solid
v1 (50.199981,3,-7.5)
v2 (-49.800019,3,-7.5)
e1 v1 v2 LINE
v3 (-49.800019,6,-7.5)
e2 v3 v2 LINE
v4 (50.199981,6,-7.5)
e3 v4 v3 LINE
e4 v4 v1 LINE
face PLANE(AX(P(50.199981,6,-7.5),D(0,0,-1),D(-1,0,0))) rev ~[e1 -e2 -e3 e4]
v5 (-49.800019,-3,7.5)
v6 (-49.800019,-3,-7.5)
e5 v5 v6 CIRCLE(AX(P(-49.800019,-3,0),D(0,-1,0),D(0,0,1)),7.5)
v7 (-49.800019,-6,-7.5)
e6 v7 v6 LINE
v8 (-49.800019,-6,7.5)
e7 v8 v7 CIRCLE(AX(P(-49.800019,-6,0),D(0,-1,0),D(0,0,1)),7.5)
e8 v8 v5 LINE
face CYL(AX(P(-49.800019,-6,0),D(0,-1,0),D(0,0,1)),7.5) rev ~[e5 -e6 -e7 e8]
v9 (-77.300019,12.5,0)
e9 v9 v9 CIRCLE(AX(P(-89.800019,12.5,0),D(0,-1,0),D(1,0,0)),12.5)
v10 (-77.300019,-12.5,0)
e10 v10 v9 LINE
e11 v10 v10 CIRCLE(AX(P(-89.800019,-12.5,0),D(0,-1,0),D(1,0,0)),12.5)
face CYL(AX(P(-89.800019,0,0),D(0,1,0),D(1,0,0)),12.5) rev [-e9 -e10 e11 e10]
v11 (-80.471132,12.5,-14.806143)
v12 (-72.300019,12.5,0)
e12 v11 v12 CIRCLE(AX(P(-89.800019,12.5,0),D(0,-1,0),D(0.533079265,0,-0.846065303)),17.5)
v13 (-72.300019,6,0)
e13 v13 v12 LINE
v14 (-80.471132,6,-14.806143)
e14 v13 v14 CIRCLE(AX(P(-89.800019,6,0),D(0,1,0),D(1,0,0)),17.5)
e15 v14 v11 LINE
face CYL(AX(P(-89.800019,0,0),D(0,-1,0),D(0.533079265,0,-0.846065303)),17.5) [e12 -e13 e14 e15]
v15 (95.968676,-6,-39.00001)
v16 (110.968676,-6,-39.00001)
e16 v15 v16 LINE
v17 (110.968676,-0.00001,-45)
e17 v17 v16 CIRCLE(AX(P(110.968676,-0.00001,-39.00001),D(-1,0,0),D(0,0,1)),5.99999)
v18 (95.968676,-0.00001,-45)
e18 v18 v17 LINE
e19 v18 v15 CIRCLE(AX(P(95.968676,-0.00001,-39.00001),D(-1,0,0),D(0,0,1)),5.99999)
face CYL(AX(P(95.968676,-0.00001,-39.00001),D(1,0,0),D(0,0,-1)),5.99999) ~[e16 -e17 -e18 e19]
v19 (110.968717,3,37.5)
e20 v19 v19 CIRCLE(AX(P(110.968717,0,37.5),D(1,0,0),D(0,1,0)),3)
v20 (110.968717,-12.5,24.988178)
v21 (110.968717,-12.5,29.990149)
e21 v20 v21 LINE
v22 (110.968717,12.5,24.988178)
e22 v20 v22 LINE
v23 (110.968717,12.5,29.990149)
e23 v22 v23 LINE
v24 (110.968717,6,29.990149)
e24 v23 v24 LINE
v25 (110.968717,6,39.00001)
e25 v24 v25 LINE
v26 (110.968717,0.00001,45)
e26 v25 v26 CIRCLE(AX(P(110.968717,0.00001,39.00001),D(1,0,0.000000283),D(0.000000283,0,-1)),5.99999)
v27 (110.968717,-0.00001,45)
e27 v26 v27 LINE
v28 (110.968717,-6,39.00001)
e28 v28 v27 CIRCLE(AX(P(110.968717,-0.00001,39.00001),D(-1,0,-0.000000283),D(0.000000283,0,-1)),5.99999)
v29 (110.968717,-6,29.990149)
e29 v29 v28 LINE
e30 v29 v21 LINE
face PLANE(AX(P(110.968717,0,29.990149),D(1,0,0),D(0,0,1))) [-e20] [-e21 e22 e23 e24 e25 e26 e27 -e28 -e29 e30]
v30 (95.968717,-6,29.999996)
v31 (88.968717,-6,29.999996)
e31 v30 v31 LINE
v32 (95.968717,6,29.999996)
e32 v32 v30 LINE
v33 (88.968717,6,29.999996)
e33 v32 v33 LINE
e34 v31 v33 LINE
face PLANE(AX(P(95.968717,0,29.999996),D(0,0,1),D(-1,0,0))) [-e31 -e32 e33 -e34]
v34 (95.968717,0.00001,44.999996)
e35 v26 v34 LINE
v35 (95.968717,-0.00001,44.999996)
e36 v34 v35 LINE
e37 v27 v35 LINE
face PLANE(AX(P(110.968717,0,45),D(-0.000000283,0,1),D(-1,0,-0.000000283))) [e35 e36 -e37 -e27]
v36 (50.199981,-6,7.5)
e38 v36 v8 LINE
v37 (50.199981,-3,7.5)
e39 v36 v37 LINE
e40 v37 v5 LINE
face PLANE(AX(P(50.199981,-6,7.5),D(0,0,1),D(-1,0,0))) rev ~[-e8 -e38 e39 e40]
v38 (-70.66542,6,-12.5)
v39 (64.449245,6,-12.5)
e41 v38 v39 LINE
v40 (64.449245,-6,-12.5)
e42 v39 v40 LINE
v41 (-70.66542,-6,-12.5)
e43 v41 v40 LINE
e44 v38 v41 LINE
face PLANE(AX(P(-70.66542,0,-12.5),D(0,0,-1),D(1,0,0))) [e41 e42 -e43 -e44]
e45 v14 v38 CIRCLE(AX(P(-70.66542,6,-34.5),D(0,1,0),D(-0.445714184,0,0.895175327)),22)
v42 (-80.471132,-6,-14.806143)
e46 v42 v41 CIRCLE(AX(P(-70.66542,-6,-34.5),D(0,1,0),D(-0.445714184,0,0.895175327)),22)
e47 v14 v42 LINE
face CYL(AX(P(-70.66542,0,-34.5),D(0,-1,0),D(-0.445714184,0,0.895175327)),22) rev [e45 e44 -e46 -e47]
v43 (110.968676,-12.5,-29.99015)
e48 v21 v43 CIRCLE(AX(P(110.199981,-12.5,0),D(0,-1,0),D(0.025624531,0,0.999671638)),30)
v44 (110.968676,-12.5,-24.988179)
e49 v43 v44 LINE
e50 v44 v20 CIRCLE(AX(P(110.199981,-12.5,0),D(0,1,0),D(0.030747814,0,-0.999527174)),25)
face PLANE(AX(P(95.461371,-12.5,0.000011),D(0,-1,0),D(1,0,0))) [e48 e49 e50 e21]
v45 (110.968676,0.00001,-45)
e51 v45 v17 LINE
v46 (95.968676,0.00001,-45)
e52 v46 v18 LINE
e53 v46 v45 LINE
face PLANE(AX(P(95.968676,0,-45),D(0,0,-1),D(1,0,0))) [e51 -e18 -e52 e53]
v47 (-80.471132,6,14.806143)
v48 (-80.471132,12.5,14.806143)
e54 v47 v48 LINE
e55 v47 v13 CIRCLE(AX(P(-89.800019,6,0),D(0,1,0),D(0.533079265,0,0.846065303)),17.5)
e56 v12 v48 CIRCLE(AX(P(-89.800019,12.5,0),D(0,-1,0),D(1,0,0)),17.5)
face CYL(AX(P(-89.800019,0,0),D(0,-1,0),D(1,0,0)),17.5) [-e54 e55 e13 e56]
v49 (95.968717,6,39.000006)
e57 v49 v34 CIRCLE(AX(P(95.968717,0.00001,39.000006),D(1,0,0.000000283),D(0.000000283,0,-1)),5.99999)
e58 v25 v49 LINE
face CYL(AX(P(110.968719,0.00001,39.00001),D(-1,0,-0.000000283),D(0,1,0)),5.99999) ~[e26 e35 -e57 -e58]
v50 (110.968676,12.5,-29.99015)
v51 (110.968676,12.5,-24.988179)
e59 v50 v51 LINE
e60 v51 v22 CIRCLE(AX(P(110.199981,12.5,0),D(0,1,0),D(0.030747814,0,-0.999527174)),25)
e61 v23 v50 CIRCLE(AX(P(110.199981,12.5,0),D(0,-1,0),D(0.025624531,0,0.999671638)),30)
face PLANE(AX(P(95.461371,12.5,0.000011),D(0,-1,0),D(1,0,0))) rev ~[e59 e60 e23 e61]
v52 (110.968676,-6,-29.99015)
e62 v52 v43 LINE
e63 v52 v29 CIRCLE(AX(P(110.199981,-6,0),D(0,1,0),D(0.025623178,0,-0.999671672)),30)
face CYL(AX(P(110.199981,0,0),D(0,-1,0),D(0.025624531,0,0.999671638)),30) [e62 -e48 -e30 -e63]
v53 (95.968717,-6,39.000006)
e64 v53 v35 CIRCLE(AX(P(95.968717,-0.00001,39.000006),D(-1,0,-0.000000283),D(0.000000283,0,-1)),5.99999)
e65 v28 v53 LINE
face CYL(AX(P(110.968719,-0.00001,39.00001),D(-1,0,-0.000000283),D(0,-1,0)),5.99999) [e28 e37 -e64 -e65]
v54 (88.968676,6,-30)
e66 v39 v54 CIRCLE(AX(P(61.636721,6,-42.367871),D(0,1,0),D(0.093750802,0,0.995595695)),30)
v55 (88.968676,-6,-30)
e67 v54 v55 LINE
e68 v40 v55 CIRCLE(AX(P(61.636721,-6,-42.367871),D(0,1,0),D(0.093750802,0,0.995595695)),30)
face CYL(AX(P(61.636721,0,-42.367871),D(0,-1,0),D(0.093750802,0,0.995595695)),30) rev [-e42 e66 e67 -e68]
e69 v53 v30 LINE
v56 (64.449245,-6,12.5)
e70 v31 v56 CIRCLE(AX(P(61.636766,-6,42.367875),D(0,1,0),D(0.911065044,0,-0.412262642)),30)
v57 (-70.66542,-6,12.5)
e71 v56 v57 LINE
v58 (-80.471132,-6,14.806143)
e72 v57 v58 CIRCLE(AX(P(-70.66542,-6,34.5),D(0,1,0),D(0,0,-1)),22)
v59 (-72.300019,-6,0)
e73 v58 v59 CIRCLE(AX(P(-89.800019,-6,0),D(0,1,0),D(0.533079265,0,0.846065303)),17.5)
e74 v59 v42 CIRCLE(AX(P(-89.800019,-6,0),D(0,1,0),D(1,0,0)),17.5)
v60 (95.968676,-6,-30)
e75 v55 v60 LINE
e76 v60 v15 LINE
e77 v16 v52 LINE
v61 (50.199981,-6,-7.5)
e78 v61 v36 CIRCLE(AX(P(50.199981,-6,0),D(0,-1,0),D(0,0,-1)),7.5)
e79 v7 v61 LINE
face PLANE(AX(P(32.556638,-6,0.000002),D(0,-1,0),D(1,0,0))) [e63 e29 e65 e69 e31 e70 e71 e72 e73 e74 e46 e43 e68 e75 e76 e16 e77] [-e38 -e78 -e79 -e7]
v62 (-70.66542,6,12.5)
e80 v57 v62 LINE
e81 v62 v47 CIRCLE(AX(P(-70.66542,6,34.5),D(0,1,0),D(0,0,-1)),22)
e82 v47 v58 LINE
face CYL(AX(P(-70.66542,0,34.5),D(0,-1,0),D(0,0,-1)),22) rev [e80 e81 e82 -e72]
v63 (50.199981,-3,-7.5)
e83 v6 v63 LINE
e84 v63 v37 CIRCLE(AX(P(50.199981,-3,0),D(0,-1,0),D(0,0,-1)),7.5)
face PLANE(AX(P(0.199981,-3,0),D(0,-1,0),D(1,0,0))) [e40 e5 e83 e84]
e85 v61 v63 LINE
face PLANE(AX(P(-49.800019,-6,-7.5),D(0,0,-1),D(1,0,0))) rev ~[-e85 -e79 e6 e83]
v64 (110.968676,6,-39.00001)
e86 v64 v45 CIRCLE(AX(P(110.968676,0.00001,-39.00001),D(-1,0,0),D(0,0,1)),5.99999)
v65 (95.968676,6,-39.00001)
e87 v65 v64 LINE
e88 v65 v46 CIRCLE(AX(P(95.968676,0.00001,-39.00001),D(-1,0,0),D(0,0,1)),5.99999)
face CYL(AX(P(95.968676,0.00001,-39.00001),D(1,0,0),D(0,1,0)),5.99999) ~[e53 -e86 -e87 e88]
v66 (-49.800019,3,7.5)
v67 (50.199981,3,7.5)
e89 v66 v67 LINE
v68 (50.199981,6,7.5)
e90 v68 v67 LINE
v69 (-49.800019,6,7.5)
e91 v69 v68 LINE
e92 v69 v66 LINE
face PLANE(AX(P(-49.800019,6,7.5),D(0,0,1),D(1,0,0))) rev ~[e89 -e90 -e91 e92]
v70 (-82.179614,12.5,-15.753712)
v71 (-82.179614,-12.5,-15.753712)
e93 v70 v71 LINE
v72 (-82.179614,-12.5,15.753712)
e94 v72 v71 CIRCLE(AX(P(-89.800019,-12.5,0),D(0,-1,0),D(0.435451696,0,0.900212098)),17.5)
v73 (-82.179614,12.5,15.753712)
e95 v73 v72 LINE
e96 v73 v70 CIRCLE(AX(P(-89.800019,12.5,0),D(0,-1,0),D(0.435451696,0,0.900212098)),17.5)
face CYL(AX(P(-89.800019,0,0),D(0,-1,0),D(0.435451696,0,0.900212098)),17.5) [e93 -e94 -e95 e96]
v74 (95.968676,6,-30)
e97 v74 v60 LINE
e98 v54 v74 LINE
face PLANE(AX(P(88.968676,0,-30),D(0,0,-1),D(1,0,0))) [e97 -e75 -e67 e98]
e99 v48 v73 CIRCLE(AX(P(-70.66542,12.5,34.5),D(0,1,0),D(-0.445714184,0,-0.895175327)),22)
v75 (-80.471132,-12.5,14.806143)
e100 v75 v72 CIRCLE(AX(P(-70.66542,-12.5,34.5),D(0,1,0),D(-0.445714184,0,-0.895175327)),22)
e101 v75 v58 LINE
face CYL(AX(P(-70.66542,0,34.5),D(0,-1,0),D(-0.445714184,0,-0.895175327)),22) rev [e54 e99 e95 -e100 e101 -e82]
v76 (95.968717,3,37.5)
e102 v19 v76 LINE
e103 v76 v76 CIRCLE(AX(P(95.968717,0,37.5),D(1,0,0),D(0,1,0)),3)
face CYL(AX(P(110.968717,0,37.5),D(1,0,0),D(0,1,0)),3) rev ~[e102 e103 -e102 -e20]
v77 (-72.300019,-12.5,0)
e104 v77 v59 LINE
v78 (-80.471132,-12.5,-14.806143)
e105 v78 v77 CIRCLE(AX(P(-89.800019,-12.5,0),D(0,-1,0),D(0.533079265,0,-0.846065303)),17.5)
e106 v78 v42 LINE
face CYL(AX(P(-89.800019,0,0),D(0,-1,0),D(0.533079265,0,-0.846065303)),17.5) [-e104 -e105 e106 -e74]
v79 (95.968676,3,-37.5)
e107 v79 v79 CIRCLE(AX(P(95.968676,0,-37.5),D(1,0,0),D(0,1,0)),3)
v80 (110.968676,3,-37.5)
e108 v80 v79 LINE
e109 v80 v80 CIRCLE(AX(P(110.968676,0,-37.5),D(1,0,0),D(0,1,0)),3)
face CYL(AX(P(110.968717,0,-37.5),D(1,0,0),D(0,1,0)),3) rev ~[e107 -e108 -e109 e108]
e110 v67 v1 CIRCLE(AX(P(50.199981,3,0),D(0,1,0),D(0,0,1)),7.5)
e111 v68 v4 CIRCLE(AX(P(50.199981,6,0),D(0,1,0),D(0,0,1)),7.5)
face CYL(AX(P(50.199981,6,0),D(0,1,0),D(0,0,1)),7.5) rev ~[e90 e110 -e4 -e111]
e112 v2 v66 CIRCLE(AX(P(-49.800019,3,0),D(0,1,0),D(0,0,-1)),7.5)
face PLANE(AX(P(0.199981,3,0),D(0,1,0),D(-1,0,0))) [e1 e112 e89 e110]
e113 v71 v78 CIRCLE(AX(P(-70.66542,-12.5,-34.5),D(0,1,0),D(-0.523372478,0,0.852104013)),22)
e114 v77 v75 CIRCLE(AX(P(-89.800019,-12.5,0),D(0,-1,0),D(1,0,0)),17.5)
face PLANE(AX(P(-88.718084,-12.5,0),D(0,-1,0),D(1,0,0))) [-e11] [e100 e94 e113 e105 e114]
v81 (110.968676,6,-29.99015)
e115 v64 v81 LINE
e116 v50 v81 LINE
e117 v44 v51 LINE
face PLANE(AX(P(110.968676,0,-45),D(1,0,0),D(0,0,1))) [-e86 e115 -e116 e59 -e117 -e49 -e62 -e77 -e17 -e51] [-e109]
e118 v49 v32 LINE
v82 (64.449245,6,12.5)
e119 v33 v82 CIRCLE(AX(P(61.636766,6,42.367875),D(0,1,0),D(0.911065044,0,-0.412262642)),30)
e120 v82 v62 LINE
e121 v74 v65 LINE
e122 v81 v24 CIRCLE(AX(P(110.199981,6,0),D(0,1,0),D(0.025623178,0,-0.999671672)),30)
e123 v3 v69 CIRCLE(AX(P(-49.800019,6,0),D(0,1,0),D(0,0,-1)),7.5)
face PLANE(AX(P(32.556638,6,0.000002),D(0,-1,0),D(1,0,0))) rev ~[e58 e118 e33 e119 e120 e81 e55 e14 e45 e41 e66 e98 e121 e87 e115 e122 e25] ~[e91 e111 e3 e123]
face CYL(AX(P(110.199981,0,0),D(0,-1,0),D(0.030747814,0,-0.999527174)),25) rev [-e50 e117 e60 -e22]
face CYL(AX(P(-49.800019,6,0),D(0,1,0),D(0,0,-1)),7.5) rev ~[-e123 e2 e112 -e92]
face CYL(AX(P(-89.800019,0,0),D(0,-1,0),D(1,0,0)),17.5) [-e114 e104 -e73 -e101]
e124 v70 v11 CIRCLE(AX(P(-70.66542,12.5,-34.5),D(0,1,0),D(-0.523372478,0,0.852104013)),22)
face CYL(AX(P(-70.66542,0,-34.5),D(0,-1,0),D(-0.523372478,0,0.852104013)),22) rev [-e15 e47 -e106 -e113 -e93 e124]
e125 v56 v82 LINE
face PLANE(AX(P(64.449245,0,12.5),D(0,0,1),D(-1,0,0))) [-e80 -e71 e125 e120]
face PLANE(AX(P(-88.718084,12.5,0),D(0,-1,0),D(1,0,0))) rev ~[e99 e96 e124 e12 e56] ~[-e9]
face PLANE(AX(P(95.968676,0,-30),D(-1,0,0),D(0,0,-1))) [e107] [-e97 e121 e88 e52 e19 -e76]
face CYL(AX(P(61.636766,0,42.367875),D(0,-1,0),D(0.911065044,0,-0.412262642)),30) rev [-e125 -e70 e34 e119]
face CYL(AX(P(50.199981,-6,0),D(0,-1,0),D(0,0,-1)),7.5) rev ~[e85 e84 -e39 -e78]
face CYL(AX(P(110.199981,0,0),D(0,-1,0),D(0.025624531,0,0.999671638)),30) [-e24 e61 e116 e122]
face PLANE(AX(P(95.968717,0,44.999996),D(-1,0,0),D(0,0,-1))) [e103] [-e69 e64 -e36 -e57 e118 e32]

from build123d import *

# Parameters (mm, degrees)
F1_DEPTH  = 12.5
F0_R      = 12.5
F2_DEPTH  = 6
F3_R      = 5.99999
F4_R      = 5.99999
F6_DEPTH  = 3
F8_DEPTH  = 3
F9_R      = 3
F10_DEPTH = 218.2697359261


# Not quite as in the source:
# - a fillet or chamfer is up to 0.001 mm smaller than in the source, because OpenCascade refuses the exact size


with BuildPart() as f1:
    # F0 (on Front) → F1 (new body, symmetric)
    with BuildSketch(Plane.XZ):
        with BuildLine():
            Line((110.9687169417, 24.9881781063), (110.9687169417, 29.9901491338))
            ThreePointArc((110.9687169417, 29.9901491338), (80.1999810155, 2.02996e-05), (110.9686763555, -29.9901501743))
            Line((110.9686763555, -29.9901501743), (110.9686763555, -24.988179355))
            ThreePointArc((110.9686763555, -24.988179355), (85.1999810155, 2.03026e-05), (110.9687169417, 24.9881781063))
        make_face()
    extrude(amount=F1_DEPTH, both=True)



with BuildPart() as f1b:
    # F0 (on Front) → F1, piece 2 (new body, symmetric)
    with BuildSketch(Plane.XZ):
        with BuildLine():
            ThreePointArc((-80.4711318513, 14.8061428082), (-81.3358966232, 15.2609531347), (-82.1796143085, 15.7537117078))
            ThreePointArc((-82.1796143085, 15.7537117078), (-107.3000189845, 0), (-82.1796143085, -15.7537117078))
            ThreePointArc((-82.1796143085, -15.7537117078), (-81.3358966232, -15.2609531347), (-80.4711318513, -14.8061428082))
            ThreePointArc((-80.4711318513, -14.8061428082), (-74.4783753907, -8.455603916), (-72.3000189845, 0))
            ThreePointArc((-72.3000189845, 0), (-74.4783753907, 8.455603916), (-80.4711318513, 14.8061428082))
        make_face()
        with Locations((-89.8000189845, 0)):
            Circle(F0_R, mode=Mode.SUBTRACT)
    extrude(amount=F1_DEPTH, both=True)


with BuildPart() as f1_1:
    add(f1.part)

    add(f1b.part)  # F2 merges F1b
    # F0 (on Front) → F2 (join, symmetric)
    with BuildSketch(Plane.XZ):
        with BuildLine():
            ThreePointArc((-70.6654197961, 12.5), (-75.702042761, 13.0842948024), (-80.4711318513, 14.8061428082))
            ThreePointArc((-80.4711318513, 14.8061428082), (-74.4783753907, 8.455603916), (-72.3000189845, 0))
            ThreePointArc((-72.3000189845, 0), (-74.4783753907, -8.455603916), (-80.4711318513, -14.8061428082))
            ThreePointArc((-80.4711318513, -14.8061428082), (-75.702042761, -13.0842948024), (-70.6654197961, -12.5))
            Line((-70.6654197961, -12.5), (64.4492452955, -12.5))
            ThreePointArc((64.4492452955, -12.5), (79.0647132666, -17.9493308815), (88.9686763555, -30))
            Line((88.9686763555, -30), (95.9686763555, -30))
            Line((95.9686763555, -30), (95.9686763555, -45))
            Line((95.9686763555, -45), (110.9686763555, -45))
            Line((110.9686763555, -45), (110.9686763555, -29.9901501743))
            ThreePointArc((110.9686763555, -29.9901501743), (80.1999810155, 2.02996e-05), (110.9687169417, 29.9901491338))
            Line((110.9687169417, 29.9901491338), (110.9687169417, 45))
            Line((110.9687169417, 45), (95.9687169417, 44.9999957531))
            Line((95.9687169417, 44.9999957531), (95.9687169417, 29.9999957531))
            Line((95.9687169417, 29.9999957531), (88.9687169417, 29.9999957531))
            ThreePointArc((88.9687169417, 29.9999957531), (79.0647357521, 17.9493194217), (64.4492452955, 12.5))
            Line((64.4492452955, 12.5), (-70.6654197961, 12.5))
        make_face()
    extrude(amount=F2_DEPTH, both=True)

    # F3 (radius 6 in the source; OpenCascade refuses exactly that, so slightly less here)
    f3_edges = [f1_1.edges().sort_by_distance(p)[0] for p in [
        (103.468717, -6, 44.999998),
        (103.468717, 6, 44.999998),
    ]]
    fillet(f3_edges, radius=F3_R)

    # F4 (radius 6 in the source; OpenCascade refuses exactly that, so slightly less here)
    f4_edges = [f1_1.edges().sort_by_distance(p)[0] for p in [
        (103.468676, -6, -45),
        (103.468676, 6, -45),
    ]]
    fillet(f4_edges, radius=F4_R)

    # F5 (on face) → F6 (cut)
    with BuildSketch(Plane.XZ.offset(6)):
        with BuildLine():
            Line((50.1999810155, 7.5), (-49.8000189845, 7.5))
            ThreePointArc((-49.8000189845, 7.5), (-57.3000189845, 0), (-49.8000189845, -7.5))
            Line((-49.8000189845, -7.5), (50.1999810155, -7.5))
            ThreePointArc((50.1999810155, -7.5), (57.6999810155, 0), (50.1999810155, 7.5))
        make_face()
    extrude(amount=-F6_DEPTH, mode=Mode.SUBTRACT)

    # F7 (on face) → F8 (cut)
    with BuildSketch(Plane(origin=(0, 6, 0), x_dir=(-1, 0, 0), z_dir=(0, 1, 0))):
        with BuildLine():
            Line((49.8000189845, 7.5), (-50.1999810155, 7.5))
            ThreePointArc((-50.1999810155, 7.5), (-57.6999810155, 0), (-50.1999810155, -7.5))
            Line((-50.1999810155, -7.5), (49.8000189845, -7.5))
            ThreePointArc((49.8000189845, -7.5), (57.3000189845, 0), (49.8000189845, 7.5))
        make_face()
    extrude(amount=-F8_DEPTH, mode=Mode.SUBTRACT)

    # F9 (on face) → F10 (cut, through all)
    with BuildSketch(Plane.YZ.offset(110.9687169417)):
        with Locations((0, 37.5)):
            Circle(F9_R)
        with Locations((0, -37.5)):
            Circle(F9_R)
    extrude(amount=-F10_DEPTH, mode=Mode.SUBTRACT)


solid = f1_1.part
